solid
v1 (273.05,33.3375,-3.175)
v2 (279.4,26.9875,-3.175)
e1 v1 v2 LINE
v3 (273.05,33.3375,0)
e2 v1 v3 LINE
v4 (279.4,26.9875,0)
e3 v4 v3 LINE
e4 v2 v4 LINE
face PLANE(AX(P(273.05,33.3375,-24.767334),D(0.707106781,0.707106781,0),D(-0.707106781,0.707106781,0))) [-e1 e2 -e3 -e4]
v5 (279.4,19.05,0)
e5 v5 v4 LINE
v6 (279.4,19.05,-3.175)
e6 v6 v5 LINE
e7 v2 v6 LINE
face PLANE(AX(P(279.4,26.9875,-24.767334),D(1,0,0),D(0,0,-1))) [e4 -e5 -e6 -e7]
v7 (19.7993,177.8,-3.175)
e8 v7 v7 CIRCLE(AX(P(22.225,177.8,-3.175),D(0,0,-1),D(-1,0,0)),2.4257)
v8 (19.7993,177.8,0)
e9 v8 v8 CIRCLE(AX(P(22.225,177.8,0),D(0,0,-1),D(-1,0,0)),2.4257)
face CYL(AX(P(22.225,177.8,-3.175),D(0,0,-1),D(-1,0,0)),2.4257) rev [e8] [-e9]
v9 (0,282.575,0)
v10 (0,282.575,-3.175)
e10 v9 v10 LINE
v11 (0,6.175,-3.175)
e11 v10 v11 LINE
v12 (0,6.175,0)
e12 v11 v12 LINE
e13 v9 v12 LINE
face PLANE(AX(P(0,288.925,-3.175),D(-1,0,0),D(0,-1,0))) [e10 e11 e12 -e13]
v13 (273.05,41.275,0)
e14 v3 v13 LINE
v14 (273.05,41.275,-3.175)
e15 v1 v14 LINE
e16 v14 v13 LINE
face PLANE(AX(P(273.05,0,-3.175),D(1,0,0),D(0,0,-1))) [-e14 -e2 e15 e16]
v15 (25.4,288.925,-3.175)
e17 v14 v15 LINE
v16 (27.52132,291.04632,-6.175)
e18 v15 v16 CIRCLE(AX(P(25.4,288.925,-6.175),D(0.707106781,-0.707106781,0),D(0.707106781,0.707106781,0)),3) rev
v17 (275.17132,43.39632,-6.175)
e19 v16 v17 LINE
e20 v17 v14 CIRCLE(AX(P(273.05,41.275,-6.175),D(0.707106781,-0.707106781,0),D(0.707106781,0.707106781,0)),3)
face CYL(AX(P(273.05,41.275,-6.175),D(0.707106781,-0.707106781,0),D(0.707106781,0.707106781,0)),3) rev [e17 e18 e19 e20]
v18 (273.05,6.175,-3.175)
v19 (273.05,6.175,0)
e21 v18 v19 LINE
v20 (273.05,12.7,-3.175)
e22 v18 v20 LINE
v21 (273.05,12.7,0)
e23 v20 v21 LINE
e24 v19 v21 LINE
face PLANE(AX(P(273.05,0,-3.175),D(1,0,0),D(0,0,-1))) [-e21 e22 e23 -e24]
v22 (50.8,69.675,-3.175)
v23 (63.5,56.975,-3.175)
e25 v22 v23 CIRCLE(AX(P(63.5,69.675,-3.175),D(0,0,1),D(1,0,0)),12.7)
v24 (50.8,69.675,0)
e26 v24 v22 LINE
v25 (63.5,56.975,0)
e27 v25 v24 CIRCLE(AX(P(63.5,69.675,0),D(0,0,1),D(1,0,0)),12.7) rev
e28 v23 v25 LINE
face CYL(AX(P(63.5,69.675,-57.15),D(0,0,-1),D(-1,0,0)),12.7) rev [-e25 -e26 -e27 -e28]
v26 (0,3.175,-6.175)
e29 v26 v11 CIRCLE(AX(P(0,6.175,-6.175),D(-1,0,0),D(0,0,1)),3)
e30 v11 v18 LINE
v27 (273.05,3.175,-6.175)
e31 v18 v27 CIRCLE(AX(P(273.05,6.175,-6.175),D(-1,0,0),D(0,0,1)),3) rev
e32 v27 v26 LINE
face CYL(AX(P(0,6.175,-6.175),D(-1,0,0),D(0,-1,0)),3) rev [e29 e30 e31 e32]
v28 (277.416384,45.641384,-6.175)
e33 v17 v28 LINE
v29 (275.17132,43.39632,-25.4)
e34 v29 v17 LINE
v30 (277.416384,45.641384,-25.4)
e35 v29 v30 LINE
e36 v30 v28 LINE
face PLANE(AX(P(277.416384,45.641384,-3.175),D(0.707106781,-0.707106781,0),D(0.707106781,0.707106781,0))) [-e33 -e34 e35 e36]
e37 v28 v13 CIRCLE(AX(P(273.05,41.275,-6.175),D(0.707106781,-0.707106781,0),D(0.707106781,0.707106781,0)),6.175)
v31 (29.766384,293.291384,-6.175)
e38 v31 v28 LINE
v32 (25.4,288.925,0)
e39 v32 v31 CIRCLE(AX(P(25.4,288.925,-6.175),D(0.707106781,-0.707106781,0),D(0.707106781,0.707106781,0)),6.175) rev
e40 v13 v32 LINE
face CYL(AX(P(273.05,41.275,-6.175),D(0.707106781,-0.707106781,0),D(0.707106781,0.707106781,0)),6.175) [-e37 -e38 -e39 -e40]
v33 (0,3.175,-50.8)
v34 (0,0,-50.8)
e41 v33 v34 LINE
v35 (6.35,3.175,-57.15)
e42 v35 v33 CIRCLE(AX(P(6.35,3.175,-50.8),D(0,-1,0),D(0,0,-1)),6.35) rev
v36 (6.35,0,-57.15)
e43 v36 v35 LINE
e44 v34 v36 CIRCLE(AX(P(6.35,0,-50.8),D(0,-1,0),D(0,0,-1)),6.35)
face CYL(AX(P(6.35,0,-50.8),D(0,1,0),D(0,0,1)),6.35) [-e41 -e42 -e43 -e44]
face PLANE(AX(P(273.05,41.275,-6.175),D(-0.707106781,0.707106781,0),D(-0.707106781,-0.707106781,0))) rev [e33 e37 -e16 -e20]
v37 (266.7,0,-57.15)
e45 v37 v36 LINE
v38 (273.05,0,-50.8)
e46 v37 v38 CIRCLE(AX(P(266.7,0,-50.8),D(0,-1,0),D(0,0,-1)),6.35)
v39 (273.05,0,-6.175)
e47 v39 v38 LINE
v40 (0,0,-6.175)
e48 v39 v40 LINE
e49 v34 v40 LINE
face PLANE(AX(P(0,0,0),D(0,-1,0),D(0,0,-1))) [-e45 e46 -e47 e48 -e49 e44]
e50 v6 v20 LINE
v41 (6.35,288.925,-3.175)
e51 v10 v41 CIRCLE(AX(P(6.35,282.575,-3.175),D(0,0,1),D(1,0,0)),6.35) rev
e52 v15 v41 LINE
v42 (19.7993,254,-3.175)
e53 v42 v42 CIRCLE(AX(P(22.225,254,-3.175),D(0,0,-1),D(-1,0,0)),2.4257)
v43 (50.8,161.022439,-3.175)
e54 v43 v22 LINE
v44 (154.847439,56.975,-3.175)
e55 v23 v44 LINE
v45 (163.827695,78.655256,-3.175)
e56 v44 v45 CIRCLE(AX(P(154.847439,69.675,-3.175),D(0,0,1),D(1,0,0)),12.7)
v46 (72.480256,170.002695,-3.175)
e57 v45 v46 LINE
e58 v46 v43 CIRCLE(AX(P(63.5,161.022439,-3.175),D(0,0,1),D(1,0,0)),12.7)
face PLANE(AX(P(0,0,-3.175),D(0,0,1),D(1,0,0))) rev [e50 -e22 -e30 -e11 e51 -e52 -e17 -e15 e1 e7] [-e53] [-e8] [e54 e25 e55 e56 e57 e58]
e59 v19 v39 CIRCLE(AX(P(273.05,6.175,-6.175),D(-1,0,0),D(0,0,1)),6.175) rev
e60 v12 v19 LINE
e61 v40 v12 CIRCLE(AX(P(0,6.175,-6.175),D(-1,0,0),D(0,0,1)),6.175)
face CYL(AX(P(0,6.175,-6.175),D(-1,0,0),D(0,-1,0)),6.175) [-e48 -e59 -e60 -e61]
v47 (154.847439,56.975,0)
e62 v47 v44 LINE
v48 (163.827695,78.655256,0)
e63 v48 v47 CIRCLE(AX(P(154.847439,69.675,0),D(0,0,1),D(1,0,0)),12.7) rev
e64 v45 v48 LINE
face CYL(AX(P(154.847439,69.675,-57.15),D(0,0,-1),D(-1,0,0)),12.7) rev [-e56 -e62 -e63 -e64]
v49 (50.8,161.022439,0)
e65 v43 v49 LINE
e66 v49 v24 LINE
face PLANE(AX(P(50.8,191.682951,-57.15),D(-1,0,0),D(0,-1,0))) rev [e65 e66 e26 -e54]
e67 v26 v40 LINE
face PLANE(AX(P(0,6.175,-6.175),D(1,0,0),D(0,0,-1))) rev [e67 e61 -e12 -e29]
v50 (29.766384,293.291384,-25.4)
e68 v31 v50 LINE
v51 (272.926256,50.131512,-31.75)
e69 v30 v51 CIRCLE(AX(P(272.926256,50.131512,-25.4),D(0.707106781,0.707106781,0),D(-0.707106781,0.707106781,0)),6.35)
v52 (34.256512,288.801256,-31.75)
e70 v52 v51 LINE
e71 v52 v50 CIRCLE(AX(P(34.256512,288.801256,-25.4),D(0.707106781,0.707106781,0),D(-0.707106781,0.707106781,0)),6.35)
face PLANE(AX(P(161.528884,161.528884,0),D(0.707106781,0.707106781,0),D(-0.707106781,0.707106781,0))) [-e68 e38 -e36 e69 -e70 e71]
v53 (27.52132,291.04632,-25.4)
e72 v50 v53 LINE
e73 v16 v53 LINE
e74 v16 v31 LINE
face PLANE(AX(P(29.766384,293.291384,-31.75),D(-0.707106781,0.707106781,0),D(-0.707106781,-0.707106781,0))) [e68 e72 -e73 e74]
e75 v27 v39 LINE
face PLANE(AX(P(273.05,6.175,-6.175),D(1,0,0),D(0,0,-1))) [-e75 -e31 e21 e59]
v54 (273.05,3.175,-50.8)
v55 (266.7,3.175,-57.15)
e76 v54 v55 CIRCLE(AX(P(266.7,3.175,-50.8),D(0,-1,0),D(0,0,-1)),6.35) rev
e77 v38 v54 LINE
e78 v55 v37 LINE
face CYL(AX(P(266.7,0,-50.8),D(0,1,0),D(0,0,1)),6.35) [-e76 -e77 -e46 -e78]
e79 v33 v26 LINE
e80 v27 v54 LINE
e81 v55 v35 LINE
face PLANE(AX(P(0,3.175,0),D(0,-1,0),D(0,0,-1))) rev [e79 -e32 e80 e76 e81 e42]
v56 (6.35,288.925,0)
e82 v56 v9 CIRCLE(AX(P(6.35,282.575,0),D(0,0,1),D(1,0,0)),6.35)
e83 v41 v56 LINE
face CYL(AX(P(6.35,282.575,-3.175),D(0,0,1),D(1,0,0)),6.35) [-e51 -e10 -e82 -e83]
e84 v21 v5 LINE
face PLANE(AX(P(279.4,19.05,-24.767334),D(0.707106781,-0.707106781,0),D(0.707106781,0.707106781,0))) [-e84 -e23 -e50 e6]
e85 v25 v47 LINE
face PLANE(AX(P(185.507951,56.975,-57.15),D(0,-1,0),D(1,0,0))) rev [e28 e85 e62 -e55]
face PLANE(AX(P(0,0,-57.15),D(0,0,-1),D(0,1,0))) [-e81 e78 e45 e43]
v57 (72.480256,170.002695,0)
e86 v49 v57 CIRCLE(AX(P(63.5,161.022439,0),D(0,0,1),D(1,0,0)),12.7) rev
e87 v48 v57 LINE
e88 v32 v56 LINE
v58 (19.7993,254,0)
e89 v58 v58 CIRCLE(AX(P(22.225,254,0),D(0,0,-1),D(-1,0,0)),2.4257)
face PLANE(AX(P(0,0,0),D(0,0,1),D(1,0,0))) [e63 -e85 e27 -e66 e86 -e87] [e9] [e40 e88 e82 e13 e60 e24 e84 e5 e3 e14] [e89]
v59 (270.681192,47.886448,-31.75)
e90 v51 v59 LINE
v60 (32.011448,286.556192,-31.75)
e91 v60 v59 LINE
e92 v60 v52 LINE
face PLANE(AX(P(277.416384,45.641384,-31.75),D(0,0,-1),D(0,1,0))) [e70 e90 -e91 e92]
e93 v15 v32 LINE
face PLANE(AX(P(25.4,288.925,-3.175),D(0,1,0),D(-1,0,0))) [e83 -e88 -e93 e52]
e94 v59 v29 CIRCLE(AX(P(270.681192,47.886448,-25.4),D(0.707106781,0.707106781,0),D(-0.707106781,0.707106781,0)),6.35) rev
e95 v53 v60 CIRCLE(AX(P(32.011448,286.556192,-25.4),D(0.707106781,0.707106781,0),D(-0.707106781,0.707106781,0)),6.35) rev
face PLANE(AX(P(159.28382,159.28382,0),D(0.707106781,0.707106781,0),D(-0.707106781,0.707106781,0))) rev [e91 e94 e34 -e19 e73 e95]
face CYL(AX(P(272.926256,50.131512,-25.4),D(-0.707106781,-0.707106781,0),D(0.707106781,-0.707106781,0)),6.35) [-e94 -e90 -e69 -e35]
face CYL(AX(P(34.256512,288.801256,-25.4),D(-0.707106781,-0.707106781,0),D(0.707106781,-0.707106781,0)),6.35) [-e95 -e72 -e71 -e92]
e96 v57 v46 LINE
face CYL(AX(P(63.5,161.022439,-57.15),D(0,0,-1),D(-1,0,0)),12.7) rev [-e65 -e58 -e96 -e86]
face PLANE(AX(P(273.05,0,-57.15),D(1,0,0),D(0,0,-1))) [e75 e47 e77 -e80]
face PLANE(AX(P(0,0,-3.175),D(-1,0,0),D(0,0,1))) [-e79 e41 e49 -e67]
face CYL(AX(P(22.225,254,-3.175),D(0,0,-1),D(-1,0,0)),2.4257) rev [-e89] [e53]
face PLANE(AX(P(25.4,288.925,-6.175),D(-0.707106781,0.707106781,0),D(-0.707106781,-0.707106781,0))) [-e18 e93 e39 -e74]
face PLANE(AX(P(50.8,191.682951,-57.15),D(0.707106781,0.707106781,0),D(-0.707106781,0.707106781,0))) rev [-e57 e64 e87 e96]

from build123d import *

# Parameters (mm, degrees)
BASE_FLANGE1_DEPTH           = 3.175
EDGE_FLANGE1_DEPTH           = 350.229988722
EDGE_FLANGE2_STRIP_W         = 18.7
EDGE_FLANGE2_STRIP_H         = 3.175
EDGE_FLANGE2_STRIP_CUT_DEPTH = 273.05
EDGE_FLANGE2_DEPTH           = 273.05
CUT_EXTRUDE1_DEPTH           = 408.732521351
FILLET1_R                    = 12.7
F_11_0_191_DIAMETER_HOLE1_D  = 4.8514
BOSS_EXTRUDE1_DEPTH          = 3.175
FILLET2_R                    = 6.35


# Sheet-metal steps are written as plain solids
with BuildPart() as part:
    # Sketch1 → Base-Flange1 (new body)
    with BuildSketch(Plane.XY):
        Polygon((0, 0), (273.05, 0), (273.05, 41.275), (25.4, 288.925), (0, 288.925), align=None)
    extrude(amount=-BASE_FLANGE1_DEPTH)

    # Edge-Flange1 section (across the edge) → Edge-Flange1 (add)
    with BuildSketch(Plane(origin=(27.521320344, 291.046320344, -3.175), x_dir=(-0.7071067811865436, -0.7071067811865516, -3.4914813388431334e-15), z_dir=(0.7071067811865516, -0.7071067811865436, 0))):
        with BuildLine():
            Line((-3.175, 3), (-3.175, 28.575))
            Line((-3.175, 28.575), (0, 28.575))
            Line((0, 28.575), (0, 3))
            ThreePointArc((0, 3), (0.878679656, 0.878679656), (3, 0))
            Line((3, 0), (3, -3.175))
            ThreePointArc((3, -3.175), (-1.366384374, -1.366384374), (-3.175, 3))
        make_face()
    extrude(amount=EDGE_FLANGE1_DEPTH)

    # Edge-Flange2 strip (across the edge) → Edge-Flange2 strip cut (cut)
    with BuildSketch(Plane(origin=(273.05, 0, -3.175), x_dir=(0, 1, 0), z_dir=(-1, 0, 0))):
        with Locations((-3.175, -1.5875)):
            Rectangle(EDGE_FLANGE2_STRIP_W, EDGE_FLANGE2_STRIP_H)
    extrude(amount=EDGE_FLANGE2_STRIP_CUT_DEPTH, mode=Mode.SUBTRACT)

    # Edge-Flange2 section (across the edge) → Edge-Flange2 (add)
    with BuildSketch(Plane(origin=(273.05, 0, -3.175), x_dir=(0, 1, 0), z_dir=(-1, 0, 0))):
        with BuildLine():
            Line((0, 3), (0, 53.975))
            Line((0, 53.975), (3.175, 53.975))
            Line((3.175, 53.975), (3.175, 3))
            ThreePointArc((3.175, 3), (4.053679656, 0.878679656), (6.175, 0))
            Line((6.175, 0), (6.175, -3.175))
            ThreePointArc((6.175, -3.175), (1.808615626, -1.366384374), (0, 3))
        make_face()
    extrude(amount=EDGE_FLANGE2_DEPTH)

    # Sketch12 → Cut-Extrude1 (cut, through all)
    with BuildSketch(Plane.XY):
        Polygon((50.8, 191.682951031), (50.8, 56.975), (185.507951031, 56.975), align=None)
    extrude(amount=-CUT_EXTRUDE1_DEPTH, mode=Mode.SUBTRACT)

    # Fillet1
    fillet1_edges = [part.edges().sort_by_distance(p)[0] for p in [
        (185.507951031, 56.975, -1.5875),
        (50.8, 56.975, -1.5875),
        (50.8, 191.682951031, -1.5875),
    ]]
    fillet(fillet1_edges, radius=FILLET1_R)

    # #11 (0.191) Diameter Hole1 (through all)
    with Locations(Plane(origin=(0, 0, -3.175), x_dir=(-1, 0, 0), z_dir=(0, 0, -1))):
        with Locations((-22.225, 254), (-22.225, 177.8)):
            Hole(F_11_0_191_DIAMETER_HOLE1_D / 2)

    # Sketch15 → Boss-Extrude1 (add)
    with BuildSketch(Plane.XY):
        Polygon((273.05, 33.3375), (279.4, 26.9875), (279.4, 19.05), (273.05, 12.7), align=None)
    extrude(amount=-BOSS_EXTRUDE1_DEPTH)

    # Fillet2
    fillet2_edges = [part.edges().sort_by_distance(p)[0] for p in [
        (28.643852359, 292.168852359, -31.75),
        (276.293852359, 44.518852359, -31.75),
        (273.05, 1.5875, -57.15),
        (0, 1.5875, -57.15),
        (0, 288.925, -1.5875),
    ]]
    fillet(fillet2_edges, radius=FILLET2_R)


solid = part.part
